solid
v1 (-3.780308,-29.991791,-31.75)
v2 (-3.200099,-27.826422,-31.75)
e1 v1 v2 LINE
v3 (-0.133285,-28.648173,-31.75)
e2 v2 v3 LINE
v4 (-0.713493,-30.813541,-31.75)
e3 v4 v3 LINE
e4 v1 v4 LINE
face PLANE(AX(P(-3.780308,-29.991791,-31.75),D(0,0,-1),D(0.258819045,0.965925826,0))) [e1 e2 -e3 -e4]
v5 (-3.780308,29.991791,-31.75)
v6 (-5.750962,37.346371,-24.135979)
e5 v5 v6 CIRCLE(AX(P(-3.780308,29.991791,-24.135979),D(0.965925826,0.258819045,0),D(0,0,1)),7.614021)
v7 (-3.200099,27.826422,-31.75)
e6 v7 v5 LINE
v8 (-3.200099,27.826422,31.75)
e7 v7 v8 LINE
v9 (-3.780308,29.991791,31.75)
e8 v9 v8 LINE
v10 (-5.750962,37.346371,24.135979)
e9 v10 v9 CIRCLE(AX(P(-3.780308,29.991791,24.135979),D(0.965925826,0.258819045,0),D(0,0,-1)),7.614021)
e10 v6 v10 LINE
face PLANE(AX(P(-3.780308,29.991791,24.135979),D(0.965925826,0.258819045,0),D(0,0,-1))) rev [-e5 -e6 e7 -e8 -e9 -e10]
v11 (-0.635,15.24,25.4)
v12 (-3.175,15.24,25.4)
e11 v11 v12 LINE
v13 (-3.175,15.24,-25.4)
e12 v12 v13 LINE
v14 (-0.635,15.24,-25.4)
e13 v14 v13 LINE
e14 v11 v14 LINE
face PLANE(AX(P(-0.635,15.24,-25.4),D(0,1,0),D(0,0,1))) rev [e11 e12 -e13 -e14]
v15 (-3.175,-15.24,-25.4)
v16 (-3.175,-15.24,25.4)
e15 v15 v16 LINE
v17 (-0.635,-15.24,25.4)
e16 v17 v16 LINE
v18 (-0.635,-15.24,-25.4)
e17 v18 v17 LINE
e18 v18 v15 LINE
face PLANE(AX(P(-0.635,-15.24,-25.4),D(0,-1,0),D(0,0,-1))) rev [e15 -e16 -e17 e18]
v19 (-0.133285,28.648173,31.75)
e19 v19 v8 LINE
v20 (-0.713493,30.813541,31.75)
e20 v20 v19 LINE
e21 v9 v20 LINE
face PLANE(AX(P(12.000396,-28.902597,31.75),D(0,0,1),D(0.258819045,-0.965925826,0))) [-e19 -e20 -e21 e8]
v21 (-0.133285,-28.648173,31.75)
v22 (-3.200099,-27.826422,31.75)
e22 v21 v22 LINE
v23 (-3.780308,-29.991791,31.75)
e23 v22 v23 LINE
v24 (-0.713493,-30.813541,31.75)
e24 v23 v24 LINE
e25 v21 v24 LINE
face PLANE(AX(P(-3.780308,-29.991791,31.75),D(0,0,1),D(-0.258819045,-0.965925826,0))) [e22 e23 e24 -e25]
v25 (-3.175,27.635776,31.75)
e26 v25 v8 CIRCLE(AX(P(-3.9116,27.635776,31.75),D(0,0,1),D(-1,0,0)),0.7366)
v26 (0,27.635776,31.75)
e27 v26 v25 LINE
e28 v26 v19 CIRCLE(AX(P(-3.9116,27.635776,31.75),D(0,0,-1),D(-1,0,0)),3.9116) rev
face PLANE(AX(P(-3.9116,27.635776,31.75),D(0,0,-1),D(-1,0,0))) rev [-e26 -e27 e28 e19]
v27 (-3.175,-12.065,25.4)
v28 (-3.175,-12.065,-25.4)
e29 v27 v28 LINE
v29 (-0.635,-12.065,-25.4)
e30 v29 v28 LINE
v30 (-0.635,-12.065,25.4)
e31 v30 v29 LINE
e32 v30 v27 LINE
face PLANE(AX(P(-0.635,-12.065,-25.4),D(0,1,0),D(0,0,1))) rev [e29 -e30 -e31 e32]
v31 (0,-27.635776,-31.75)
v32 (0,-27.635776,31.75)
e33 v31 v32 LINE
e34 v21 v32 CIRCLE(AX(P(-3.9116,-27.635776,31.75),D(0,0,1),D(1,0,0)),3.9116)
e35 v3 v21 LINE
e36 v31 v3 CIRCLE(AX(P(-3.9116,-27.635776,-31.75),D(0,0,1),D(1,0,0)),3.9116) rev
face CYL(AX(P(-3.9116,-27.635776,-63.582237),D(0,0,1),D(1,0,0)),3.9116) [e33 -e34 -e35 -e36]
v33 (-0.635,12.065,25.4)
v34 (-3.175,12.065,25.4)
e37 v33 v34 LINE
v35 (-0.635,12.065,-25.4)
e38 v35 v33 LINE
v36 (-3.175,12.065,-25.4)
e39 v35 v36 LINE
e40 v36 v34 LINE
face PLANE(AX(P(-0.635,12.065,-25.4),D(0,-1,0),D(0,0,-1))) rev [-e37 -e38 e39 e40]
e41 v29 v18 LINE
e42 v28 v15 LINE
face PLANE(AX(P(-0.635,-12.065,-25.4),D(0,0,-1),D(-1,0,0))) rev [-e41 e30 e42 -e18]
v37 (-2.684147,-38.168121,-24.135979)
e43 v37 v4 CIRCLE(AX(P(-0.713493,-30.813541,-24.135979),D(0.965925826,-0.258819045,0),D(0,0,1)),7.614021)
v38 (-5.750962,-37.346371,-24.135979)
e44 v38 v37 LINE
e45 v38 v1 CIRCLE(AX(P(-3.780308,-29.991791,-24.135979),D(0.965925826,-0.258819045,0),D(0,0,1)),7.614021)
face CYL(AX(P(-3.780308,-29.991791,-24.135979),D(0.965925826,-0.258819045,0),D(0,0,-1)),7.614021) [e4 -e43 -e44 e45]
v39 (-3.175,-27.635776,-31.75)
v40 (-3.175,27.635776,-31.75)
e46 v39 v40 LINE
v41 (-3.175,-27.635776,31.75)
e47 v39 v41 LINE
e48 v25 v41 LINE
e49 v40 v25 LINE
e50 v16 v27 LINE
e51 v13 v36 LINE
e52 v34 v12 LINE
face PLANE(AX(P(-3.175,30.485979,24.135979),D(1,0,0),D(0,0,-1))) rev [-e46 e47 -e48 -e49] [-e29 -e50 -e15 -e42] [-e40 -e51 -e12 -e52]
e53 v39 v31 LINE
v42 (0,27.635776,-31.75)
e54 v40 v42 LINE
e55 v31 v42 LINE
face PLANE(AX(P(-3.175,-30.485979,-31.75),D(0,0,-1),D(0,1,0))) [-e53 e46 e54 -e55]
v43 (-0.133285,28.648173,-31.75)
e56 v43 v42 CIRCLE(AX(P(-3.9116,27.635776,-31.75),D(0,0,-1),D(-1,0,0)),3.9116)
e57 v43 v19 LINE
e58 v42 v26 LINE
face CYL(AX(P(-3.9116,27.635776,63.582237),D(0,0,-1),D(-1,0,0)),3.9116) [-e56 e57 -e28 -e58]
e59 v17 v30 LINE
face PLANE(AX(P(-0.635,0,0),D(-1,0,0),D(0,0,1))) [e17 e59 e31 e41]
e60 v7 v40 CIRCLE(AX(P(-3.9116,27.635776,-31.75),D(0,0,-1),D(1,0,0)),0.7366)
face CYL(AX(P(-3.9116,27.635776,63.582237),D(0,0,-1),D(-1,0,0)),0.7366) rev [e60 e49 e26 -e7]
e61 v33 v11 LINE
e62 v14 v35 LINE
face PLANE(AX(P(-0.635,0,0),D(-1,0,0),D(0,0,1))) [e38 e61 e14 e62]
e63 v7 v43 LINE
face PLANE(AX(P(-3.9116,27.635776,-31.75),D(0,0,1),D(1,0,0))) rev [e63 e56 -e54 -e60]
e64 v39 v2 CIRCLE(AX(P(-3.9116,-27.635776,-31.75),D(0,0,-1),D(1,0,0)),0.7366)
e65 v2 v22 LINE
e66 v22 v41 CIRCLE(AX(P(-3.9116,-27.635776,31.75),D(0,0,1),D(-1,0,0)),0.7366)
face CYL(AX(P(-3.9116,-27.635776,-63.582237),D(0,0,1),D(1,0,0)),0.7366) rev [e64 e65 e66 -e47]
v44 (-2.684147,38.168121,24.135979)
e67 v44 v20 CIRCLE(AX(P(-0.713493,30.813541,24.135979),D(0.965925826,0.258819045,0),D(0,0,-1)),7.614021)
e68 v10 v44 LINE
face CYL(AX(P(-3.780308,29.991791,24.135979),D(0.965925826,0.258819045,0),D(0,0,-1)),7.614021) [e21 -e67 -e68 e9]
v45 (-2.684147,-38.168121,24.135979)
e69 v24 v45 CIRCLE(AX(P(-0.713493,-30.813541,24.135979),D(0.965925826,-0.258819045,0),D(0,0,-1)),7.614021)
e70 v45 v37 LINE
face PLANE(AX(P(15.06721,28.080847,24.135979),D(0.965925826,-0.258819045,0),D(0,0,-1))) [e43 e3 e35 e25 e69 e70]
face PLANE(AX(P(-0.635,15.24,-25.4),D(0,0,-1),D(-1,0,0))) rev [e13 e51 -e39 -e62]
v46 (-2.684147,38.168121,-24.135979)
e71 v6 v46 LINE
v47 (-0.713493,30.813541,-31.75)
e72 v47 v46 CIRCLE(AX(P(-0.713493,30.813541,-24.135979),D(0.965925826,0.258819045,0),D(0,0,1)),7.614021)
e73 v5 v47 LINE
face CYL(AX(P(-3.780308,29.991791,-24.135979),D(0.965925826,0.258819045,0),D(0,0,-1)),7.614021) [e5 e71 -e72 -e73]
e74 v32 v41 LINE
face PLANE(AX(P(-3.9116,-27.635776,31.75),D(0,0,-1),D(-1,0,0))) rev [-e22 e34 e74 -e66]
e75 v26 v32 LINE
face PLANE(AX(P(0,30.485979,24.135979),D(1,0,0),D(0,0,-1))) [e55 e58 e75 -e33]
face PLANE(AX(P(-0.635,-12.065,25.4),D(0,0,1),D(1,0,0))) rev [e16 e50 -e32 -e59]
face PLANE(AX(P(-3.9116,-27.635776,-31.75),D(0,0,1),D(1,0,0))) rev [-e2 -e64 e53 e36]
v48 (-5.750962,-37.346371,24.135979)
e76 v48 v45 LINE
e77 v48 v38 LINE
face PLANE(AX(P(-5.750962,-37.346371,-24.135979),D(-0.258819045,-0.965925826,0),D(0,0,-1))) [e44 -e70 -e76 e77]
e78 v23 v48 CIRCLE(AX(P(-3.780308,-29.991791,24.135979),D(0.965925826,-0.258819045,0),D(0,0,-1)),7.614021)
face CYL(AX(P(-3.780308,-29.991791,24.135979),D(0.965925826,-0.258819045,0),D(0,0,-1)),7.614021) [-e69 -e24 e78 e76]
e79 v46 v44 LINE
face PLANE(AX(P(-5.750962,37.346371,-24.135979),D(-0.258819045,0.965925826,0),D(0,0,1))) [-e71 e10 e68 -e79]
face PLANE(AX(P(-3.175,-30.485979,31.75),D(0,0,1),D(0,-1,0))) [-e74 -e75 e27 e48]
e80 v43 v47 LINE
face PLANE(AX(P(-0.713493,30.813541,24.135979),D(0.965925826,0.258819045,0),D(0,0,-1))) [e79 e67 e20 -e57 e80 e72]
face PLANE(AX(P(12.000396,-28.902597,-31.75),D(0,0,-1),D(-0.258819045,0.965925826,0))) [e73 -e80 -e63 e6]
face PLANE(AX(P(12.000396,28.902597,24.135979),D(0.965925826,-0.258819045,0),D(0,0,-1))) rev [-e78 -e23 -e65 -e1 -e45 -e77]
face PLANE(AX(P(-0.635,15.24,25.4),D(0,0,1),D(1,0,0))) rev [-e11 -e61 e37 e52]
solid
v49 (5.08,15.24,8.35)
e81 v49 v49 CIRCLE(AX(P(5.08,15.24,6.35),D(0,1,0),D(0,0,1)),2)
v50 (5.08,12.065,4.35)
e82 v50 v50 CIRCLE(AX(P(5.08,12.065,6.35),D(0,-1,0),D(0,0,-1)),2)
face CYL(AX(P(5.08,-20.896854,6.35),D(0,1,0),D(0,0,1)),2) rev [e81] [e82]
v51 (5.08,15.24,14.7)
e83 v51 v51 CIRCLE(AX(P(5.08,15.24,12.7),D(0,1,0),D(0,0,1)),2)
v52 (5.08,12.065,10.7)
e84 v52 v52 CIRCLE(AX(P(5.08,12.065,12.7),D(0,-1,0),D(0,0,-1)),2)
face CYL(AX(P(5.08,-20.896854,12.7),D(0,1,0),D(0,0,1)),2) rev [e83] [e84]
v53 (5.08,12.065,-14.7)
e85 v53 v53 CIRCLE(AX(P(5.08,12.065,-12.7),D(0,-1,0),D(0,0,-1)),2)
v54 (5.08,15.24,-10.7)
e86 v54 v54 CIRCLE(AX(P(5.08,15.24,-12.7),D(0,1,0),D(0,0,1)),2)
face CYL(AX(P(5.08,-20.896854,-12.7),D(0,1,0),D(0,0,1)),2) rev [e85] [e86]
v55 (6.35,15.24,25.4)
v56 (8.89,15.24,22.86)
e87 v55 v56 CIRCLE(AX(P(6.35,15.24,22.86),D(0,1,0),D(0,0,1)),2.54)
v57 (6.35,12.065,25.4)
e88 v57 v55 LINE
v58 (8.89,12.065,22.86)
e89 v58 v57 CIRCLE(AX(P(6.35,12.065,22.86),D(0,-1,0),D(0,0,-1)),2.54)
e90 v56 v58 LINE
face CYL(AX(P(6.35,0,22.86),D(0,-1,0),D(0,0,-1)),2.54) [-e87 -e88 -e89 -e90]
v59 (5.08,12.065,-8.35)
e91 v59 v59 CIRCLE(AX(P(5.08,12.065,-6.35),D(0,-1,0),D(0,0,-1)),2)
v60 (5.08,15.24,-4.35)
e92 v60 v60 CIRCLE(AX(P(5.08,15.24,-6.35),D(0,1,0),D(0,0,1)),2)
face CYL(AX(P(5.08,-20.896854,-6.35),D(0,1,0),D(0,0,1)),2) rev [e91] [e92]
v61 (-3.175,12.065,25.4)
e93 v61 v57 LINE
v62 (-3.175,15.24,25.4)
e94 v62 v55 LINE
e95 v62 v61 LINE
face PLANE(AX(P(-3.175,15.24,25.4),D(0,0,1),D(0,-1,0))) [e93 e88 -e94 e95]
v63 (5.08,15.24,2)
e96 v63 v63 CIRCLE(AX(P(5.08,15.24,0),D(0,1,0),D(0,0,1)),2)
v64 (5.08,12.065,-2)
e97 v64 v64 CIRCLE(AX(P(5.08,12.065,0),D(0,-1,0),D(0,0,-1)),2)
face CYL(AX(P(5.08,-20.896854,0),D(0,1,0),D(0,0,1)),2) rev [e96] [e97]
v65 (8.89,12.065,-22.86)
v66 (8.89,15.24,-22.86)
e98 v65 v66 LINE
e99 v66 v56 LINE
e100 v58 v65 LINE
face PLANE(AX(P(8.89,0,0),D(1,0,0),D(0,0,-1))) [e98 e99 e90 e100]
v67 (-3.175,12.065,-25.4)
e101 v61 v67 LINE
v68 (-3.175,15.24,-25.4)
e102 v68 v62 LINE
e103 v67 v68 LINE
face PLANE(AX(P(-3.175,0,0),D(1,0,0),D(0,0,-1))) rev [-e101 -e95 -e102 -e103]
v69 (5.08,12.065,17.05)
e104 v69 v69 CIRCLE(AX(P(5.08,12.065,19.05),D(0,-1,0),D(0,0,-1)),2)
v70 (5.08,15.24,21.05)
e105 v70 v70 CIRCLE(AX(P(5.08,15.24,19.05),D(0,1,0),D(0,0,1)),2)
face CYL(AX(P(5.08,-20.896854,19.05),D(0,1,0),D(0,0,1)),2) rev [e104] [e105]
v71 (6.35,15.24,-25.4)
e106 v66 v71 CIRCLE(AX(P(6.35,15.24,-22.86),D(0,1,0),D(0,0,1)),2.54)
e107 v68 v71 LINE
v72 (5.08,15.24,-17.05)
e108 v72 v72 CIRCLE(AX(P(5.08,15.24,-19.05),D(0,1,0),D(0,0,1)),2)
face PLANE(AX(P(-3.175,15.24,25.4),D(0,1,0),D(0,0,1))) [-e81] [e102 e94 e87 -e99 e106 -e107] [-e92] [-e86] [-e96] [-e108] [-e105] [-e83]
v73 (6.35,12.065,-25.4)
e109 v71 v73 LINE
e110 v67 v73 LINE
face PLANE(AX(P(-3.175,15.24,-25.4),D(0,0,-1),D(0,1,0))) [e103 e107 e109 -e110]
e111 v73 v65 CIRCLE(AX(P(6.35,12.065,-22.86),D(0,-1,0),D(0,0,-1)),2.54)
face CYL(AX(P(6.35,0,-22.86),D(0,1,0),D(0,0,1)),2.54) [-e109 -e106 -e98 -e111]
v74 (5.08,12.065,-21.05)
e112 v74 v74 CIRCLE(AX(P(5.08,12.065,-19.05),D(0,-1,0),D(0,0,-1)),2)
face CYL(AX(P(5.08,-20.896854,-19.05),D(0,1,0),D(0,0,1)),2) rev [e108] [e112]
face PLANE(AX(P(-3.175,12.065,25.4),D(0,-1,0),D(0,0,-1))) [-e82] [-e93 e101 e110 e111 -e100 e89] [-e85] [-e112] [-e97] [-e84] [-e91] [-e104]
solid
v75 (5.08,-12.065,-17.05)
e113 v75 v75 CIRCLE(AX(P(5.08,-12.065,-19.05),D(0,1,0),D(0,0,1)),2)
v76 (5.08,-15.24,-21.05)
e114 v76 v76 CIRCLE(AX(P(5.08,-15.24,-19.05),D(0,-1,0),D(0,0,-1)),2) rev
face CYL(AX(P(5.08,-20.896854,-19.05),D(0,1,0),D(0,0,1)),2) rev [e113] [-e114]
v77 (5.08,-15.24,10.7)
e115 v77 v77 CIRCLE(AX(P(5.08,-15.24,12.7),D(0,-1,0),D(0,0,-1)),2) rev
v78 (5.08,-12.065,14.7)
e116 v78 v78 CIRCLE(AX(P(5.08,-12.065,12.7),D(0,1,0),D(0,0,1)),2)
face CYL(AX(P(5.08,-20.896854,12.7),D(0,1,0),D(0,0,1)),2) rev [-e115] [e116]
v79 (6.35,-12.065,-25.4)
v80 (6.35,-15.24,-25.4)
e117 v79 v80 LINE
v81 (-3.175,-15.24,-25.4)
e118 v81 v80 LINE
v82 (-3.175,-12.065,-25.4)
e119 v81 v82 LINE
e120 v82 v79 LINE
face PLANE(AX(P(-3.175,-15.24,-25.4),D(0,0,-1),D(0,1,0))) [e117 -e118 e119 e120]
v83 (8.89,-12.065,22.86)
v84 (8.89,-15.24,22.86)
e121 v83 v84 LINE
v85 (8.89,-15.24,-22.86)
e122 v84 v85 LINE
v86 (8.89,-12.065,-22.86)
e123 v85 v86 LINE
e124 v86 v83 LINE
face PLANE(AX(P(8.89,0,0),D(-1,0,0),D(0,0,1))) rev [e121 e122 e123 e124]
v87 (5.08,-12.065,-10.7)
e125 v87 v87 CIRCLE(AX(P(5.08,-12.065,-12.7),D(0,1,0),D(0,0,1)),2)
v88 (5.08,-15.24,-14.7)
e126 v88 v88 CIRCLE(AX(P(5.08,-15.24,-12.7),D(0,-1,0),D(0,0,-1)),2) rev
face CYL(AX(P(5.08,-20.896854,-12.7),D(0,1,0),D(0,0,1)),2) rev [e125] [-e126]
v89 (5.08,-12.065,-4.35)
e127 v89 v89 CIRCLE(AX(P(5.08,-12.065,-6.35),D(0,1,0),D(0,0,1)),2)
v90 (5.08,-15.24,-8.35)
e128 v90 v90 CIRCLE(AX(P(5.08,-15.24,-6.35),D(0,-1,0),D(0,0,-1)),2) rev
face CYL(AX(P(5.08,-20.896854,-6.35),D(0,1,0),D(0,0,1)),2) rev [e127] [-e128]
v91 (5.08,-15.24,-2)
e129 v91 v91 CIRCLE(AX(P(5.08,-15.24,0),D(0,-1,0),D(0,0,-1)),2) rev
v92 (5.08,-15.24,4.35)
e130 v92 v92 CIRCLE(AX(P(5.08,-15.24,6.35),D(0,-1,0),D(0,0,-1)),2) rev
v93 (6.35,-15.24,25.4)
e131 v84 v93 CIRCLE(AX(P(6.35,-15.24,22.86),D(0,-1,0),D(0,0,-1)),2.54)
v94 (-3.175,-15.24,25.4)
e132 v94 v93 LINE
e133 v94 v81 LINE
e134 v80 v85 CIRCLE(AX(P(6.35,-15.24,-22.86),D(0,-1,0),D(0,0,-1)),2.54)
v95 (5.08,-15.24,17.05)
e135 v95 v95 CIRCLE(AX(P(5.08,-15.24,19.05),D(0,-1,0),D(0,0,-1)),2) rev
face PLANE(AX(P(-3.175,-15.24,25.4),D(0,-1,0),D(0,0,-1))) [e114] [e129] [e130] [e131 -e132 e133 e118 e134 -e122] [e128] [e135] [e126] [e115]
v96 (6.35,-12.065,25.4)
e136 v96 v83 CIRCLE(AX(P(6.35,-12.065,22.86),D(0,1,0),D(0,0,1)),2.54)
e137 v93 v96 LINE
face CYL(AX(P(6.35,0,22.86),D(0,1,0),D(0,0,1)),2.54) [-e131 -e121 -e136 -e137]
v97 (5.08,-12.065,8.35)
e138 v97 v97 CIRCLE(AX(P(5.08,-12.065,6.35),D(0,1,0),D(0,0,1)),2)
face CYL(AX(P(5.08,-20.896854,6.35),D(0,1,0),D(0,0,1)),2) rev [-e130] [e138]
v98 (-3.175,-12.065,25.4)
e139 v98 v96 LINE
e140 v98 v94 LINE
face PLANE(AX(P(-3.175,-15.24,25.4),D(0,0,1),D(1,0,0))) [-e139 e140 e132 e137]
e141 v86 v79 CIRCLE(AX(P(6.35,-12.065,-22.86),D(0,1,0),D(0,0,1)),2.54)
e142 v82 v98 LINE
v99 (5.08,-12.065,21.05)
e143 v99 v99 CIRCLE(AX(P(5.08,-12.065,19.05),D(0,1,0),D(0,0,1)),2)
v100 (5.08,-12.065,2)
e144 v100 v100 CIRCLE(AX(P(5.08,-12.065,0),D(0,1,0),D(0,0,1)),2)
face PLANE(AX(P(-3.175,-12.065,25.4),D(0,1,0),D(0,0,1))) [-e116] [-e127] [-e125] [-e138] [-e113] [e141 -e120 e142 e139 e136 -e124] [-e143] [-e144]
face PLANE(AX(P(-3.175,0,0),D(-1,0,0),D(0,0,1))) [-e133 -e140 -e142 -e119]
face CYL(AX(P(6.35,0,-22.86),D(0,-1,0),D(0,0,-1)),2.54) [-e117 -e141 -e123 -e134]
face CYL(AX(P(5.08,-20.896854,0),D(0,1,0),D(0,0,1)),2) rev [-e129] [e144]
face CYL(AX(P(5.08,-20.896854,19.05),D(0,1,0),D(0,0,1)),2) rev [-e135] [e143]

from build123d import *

# Parameters (mm, degrees)
BASE_FLANGE1_DEPTH         = 3.175
SKETCHED_START             = -31.75
SKETCHED_BEND3_DEPTH       = 63.5
SKETCHED_START_2           = -24.135978559
SKETCHED_BEND3_2_DEPTH     = 48.271957118
SKETCHED_BEND3_3_DEPTH     = 63.5
SKETCHED_START_3           = 4.384939983
SKETCHED_BEND3_4_DEPTH     = 2.901009715
SKETCHED_START_4           = 4.370325746
SKETCHED_BEND3_5_DEPTH     = 2.915623952
SKETCHED_START_5           = 3
SKETCHED_BEND3_6_DEPTH     = 4.104292999
SKETCHED_BEND3_7_DEPTH     = 4.285949698
BOSS_EXTRUDE4_DEPTH        = 8.89
BOSS_EXTRUDE4_DEPTH_BACK   = 3.175
SKETCH11_W                 = 50.8
SKETCH11_H                 = 3.175
BOSS_EXTRUDE4_2_DEPTH      = 8.89
BOSS_EXTRUDE4_2_DEPTH_BACK = 3.175
CUT_EXTRUDE1_START         = -30.48
SKETCH14_R                 = 2
CUT_EXTRUDE1_DEPTH         = 30.48
FILLET1_R                  = 2.54
FILLET2_R                  = 2.54
SKETCH15_W                 = 50.8
SKETCH15_H                 = 3.175
CUT_EXTRUDE3_DEPTH         = 2.54


with BuildPart() as part:
    # Base-Flange1: sheet metal written as solids
    # Sketch1 → Base-Flange1 (new body)
    with BuildSketch(Plane(origin=(0, 0, 0), x_dir=(0, 0, -1), z_dir=(1, 0, 0))):
        with BuildLine():
            Line((24.135978559, -38.1), (-24.135978559, -38.1))
            ThreePointArc((-24.135978559, -38.1), (-29.519904752, -35.869904752), (-31.75, -30.485978559))
            Line((-31.75, -30.485978559), (-31.75, 30.485978559))
            ThreePointArc((-31.75, 30.485978559), (-29.519904752, 35.869904752), (-24.135978559, 38.1))
            Line((-24.135978559, 38.1), (24.135978559, 38.1))
            ThreePointArc((24.135978559, 38.1), (29.519904752, 35.869904752), (31.75, 30.485978559))
            Line((31.75, 30.485978559), (31.75, -30.485978559))
            ThreePointArc((31.75, -30.485978559), (29.519904752, -35.869904752), (24.135978559, -38.1))
        make_face()
    extrude(amount=-BASE_FLANGE1_DEPTH)

    # Sketched Bend3: read off the stored shape, not the designer's step
    # Sketched Bend3 outline → Sketched Bend3 (cut)
    with BuildSketch(Plane.XY.offset(SKETCHED_START)):
        Polygon((-2.938378837, -38.1), (-3.175, -38.03659755), (-3.175, -38.1), align=None)
        Polygon((-3.175, 38.1), (-3.175, 38.03659755), (-2.938378837, 38.1), align=None)
        with BuildLine():
            Line((-0.133284538, -28.648172598), (-2.665894057, -38.1))
            Line((-2.665894057, -38.1), (0, -38.1))
            Line((0, -38.1), (0, -27.635776021))
            ThreePointArc((0, -27.635776021), (-0.03346428, -28.146342275), (-0.133284538, -28.648172598))
        make_face()
        with BuildLine():
            Line((0, 38.1), (-2.665894057, 38.1))
            Line((-2.665894057, 38.1), (-0.133284538, 28.648172598))
            ThreePointArc((-0.133284538, 28.648172598), (-0.03346428, 28.146342275), (0, 27.635776021))
            Line((0, 27.635776021), (0, 38.1))
        make_face()
    extrude(amount=SKETCHED_BEND3_DEPTH, mode=Mode.SUBTRACT)

    # Sketched Bend3 2 outline → Sketched Bend3 2 (add)
    with BuildSketch(Plane.XY.offset(SKETCHED_START_2)):
        with BuildLine():
            ThreePointArc((-3.175, -27.635776021), (-3.181301715, -27.731921614), (-3.200099036, -27.82642213))
            Line((-3.200099036, -27.82642213), (-5.750961575, -37.346370727))
            Line((-5.750961575, -37.346370727), (-3.175, -38.03659755))
            Line((-3.175, -38.03659755), (-3.175, -27.635776021))
        make_face()
        with BuildLine():
            ThreePointArc((-3.200099036, 27.82642213), (-3.181301715, 27.731921614), (-3.175, 27.635776021))
            Line((-3.175, 27.635776021), (-3.175, 38.03659755))
            Line((-3.175, 38.03659755), (-5.750961575, 37.346370727))
            Line((-5.750961575, 37.346370727), (-3.200099036, 27.82642213))
        make_face()
        Polygon((-2.665894057, -38.1), (-2.938378837, -38.1), (-2.684147076, -38.168121195), align=None)
        Polygon((-2.684147076, 38.168121195), (-2.938378837, 38.1), (-2.665894057, 38.1), align=None)
    extrude(amount=SKETCHED_BEND3_2_DEPTH)

    # Sketched Bend3 3 outline → Sketched Bend3 3 (add)
    with BuildSketch(Plane.XY.offset(SKETCHED_START)):
        with BuildLine():
            ThreePointArc((-3.200099036, 27.82642213), (-3.181301715, 27.731921614), (-3.175, 27.635776021))
            Line((-3.175, 27.635776021), (-3.175, 38.03659755))
            Line((-3.175, 38.03659755), (-5.750961575, 37.346370727))
            Line((-5.750961575, 37.346370727), (-3.200099036, 27.82642213))
        make_face()
        with BuildLine():
            ThreePointArc((-3.175, -27.635776021), (-3.181301715, -27.731921614), (-3.200099036, -27.82642213))
            Line((-3.200099036, -27.82642213), (-5.750961575, -37.346370727))
            Line((-5.750961575, -37.346370727), (-3.175, -38.03659755))
            Line((-3.175, -38.03659755), (-3.175, -27.635776021))
        make_face()
    extrude(amount=SKETCHED_BEND3_3_DEPTH)

    # Sketched Bend3 4 outline → Sketched Bend3 4 (add)
    with BuildSketch(Plane(origin=(0, 0, 0), x_dir=(0.2588190451025211, 0.9659258262890682, 0), z_dir=(0.9659258262890682, -0.2588190451025211, 0)).offset(SKETCHED_START_3)):
        with BuildLine():
            Line((-28, 31.75), (-29.948260946, 31.75))
            ThreePointArc((-29.948260946, 31.75), (-35.332187139, 29.519904752), (-37.562282387, 24.135978559))
            Line((-37.562282387, 24.135978559), (-28, 24.135978559))
            Line((-28, 24.135978559), (-28, 31.75))
        make_face()
        with BuildLine():
            Line((-28, -24.135978559), (-37.562282387, -24.135978559))
            ThreePointArc((-37.562282387, -24.135978559), (-35.332187139, -29.519904752), (-29.948260946, -31.75))
            Line((-29.948260946, -31.75), (-28, -31.75))
            Line((-28, -31.75), (-28, -24.135978559))
        make_face()
    extrude(amount=SKETCHED_BEND3_4_DEPTH)

    # Sketched Bend3 5 outline → Sketched Bend3 5 (add)
    with BuildSketch(Plane(origin=(0, 0, 0), x_dir=(-0.2588190451025211, 0.9659258262890682, 0), z_dir=(0.9659258262890682, 0.2588190451025211, 0)).offset(SKETCHED_START_4)):
        with BuildLine():
            Line((28, -31.75), (29.948260946, -31.75))
            ThreePointArc((29.948260946, -31.75), (35.332187139, -29.519904752), (37.562282387, -24.135978559))
            Line((37.562282387, -24.135978559), (28, -24.135978559))
            Line((28, -24.135978559), (28, -31.75))
        make_face()
        with BuildLine():
            Line((28, 24.135978559), (37.562282387, 24.135978559))
            ThreePointArc((37.562282387, 24.135978559), (35.332187139, 29.519904752), (29.948260946, 31.75))
            Line((29.948260946, 31.75), (28, 31.75))
            Line((28, 31.75), (28, 24.135978559))
        make_face()
    extrude(amount=SKETCHED_BEND3_5_DEPTH)

    # Sketched Bend3 6 outline → Sketched Bend3 6 (cut)
    with BuildSketch(Plane(origin=(0, 0, 0), x_dir=(0.2588190451025211, 0.9659258262890682, 0), z_dir=(0.9659258262890682, -0.2588190451025211, 0)).offset(SKETCHED_START_5)):
        with BuildLine():
            ThreePointArc((-37.562282387, 24.135978559), (-35.332187139, 29.519904752), (-29.948260946, 31.75))
            Line((-29.948260946, 31.75), (-28, 31.75))
            Line((-28, 31.75), (-28, 33))
            Line((-28, 33), (-37.562282387, 33))
            Line((-37.562282387, 33), (-37.562282387, 24.135978559))
        make_face()
        with BuildLine():
            ThreePointArc((-29.948260946, -31.75), (-35.332187139, -29.519904752), (-37.562282387, -24.135978559))
            Line((-37.562282387, -24.135978559), (-37.562282387, -33))
            Line((-37.562282387, -33), (-28, -33))
            Line((-28, -33), (-28, -31.75))
            Line((-28, -31.75), (-29.948260946, -31.75))
        make_face()
    extrude(amount=SKETCHED_BEND3_6_DEPTH, mode=Mode.SUBTRACT)

    # Sketched Bend3 7 outline → Sketched Bend3 7 (cut)
    with BuildSketch(Plane(origin=(0, 0, 0), x_dir=(-0.2588190451025211, 0.9659258262890682, 0), z_dir=(0.9659258262890682, 0.2588190451025211, 0)).offset(SKETCHED_START_5)):
        with BuildLine():
            ThreePointArc((37.562282387, -24.135978559), (35.332187139, -29.519904752), (29.948260946, -31.75))
            Line((29.948260946, -31.75), (28, -31.75))
            Line((28, -31.75), (28, -33))
            Line((28, -33), (37.562282386, -33))
            Line((37.562282386, -33), (37.562282387, -24.135978559))
        make_face()
        with BuildLine():
            ThreePointArc((29.948260946, 31.75), (35.332187139, 29.519904752), (37.562282387, 24.135978559))
            Line((37.562282387, 24.135978559), (37.562282386, 33))
            Line((37.562282386, 33), (28, 33))
            Line((28, 33), (28, 31.75))
            Line((28, 31.75), (29.948260946, 31.75))
        make_face()
    extrude(amount=SKETCHED_BEND3_7_DEPTH, mode=Mode.SUBTRACT)

    # Sketch15 → Cut-Extrude3 (cut)
    with BuildSketch(Plane.ZY.offset(3.175)):
        with Locations((0, 13.6525)):
            Rectangle(SKETCH15_W, SKETCH15_H)
        with Locations((0, -13.6525)):
            Rectangle(SKETCH15_W, SKETCH15_H)
    extrude(amount=-CUT_EXTRUDE3_DEPTH, mode=Mode.SUBTRACT)


with BuildPart() as body_2:
    # Sketch11 → Boss-Extrude4 (new, two sides: drawn at the far end of the back side and taken through both)
    with BuildSketch(Plane(origin=(0, 0, 0), x_dir=(0, 0, -1), z_dir=(1, 0, 0)).offset(-BOSS_EXTRUDE4_DEPTH_BACK)):
        with Locations((0, -13.6525)):
            Rectangle(SKETCH11_W, SKETCH11_H)
    extrude(amount=BOSS_EXTRUDE4_DEPTH + BOSS_EXTRUDE4_DEPTH_BACK)


with BuildPart() as body_3:
    # Sketch11 → Boss-Extrude4 2 (new, two sides: drawn at the far end of the back side and taken through both)
    with BuildSketch(Plane(origin=(0, 0, 0), x_dir=(0, 0, -1), z_dir=(1, 0, 0)).offset(-BOSS_EXTRUDE4_2_DEPTH_BACK)):
        with Locations((0, 13.6525)):
            Rectangle(SKETCH11_W, SKETCH11_H)
    extrude(amount=BOSS_EXTRUDE4_2_DEPTH + BOSS_EXTRUDE4_2_DEPTH_BACK)


with BuildPart() as cut_extrude1_tool:
    # Sketch14 → Cut-Extrude1 (new body)
    with BuildSketch(Plane(origin=(0, 15.24, 0), x_dir=(1, 0, 0), z_dir=(0, 1, 0)).offset(CUT_EXTRUDE1_START)):
        with Locations(Location((5.08, -12.7, 0), (0, 0, 270))):
            Circle(SKETCH14_R)
        with Locations(Location((5.08, -6.35, 0), (0, 0, 270))):
            Circle(SKETCH14_R)
        with Locations(Location((5.08, 0, 0), (0, 0, 270))):
            Circle(SKETCH14_R)
        with Locations(Location((5.08, 6.35, 0), (0, 0, 270))):
            Circle(SKETCH14_R)
        with Locations(Location((5.08, 12.7, 0), (0, 0, 270))):
            Circle(SKETCH14_R)
        with Locations(Location((5.08, -19.05, 0), (0, 0, 270))):
            Circle(SKETCH14_R)
        with Locations(Location((5.08, 19.05, 0), (0, 0, 270))):
            Circle(SKETCH14_R)
    extrude(amount=CUT_EXTRUDE1_DEPTH)


with BuildPart() as body_2_1:
    add(body_2.part)

    # Cut-Extrude1: cut by cut_extrude1_tool
    add(cut_extrude1_tool.part, mode=Mode.SUBTRACT)

    # Fillet1
    fillet1_edges = [body_2_1.edges().sort_by_distance(p)[0] for p in [
        (8.89, -13.6525, 25.4),
        (8.89, -13.6525, -25.4),
    ]]
    fillet(fillet1_edges, radius=FILLET1_R)


with BuildPart() as body_3_1:
    add(body_3.part)

    # Cut-Extrude1: cut by cut_extrude1_tool
    add(cut_extrude1_tool.part, mode=Mode.SUBTRACT)

    # Fillet2
    fillet2_edges = [body_3_1.edges().sort_by_distance(p)[0] for p in [
        (8.89, 13.6525, 25.4),
        (8.89, 13.6525, -25.4),
    ]]
    fillet(fillet2_edges, radius=FILLET2_R)


solid = Compound([part.part, body_2_1.part, body_3_1.part])
